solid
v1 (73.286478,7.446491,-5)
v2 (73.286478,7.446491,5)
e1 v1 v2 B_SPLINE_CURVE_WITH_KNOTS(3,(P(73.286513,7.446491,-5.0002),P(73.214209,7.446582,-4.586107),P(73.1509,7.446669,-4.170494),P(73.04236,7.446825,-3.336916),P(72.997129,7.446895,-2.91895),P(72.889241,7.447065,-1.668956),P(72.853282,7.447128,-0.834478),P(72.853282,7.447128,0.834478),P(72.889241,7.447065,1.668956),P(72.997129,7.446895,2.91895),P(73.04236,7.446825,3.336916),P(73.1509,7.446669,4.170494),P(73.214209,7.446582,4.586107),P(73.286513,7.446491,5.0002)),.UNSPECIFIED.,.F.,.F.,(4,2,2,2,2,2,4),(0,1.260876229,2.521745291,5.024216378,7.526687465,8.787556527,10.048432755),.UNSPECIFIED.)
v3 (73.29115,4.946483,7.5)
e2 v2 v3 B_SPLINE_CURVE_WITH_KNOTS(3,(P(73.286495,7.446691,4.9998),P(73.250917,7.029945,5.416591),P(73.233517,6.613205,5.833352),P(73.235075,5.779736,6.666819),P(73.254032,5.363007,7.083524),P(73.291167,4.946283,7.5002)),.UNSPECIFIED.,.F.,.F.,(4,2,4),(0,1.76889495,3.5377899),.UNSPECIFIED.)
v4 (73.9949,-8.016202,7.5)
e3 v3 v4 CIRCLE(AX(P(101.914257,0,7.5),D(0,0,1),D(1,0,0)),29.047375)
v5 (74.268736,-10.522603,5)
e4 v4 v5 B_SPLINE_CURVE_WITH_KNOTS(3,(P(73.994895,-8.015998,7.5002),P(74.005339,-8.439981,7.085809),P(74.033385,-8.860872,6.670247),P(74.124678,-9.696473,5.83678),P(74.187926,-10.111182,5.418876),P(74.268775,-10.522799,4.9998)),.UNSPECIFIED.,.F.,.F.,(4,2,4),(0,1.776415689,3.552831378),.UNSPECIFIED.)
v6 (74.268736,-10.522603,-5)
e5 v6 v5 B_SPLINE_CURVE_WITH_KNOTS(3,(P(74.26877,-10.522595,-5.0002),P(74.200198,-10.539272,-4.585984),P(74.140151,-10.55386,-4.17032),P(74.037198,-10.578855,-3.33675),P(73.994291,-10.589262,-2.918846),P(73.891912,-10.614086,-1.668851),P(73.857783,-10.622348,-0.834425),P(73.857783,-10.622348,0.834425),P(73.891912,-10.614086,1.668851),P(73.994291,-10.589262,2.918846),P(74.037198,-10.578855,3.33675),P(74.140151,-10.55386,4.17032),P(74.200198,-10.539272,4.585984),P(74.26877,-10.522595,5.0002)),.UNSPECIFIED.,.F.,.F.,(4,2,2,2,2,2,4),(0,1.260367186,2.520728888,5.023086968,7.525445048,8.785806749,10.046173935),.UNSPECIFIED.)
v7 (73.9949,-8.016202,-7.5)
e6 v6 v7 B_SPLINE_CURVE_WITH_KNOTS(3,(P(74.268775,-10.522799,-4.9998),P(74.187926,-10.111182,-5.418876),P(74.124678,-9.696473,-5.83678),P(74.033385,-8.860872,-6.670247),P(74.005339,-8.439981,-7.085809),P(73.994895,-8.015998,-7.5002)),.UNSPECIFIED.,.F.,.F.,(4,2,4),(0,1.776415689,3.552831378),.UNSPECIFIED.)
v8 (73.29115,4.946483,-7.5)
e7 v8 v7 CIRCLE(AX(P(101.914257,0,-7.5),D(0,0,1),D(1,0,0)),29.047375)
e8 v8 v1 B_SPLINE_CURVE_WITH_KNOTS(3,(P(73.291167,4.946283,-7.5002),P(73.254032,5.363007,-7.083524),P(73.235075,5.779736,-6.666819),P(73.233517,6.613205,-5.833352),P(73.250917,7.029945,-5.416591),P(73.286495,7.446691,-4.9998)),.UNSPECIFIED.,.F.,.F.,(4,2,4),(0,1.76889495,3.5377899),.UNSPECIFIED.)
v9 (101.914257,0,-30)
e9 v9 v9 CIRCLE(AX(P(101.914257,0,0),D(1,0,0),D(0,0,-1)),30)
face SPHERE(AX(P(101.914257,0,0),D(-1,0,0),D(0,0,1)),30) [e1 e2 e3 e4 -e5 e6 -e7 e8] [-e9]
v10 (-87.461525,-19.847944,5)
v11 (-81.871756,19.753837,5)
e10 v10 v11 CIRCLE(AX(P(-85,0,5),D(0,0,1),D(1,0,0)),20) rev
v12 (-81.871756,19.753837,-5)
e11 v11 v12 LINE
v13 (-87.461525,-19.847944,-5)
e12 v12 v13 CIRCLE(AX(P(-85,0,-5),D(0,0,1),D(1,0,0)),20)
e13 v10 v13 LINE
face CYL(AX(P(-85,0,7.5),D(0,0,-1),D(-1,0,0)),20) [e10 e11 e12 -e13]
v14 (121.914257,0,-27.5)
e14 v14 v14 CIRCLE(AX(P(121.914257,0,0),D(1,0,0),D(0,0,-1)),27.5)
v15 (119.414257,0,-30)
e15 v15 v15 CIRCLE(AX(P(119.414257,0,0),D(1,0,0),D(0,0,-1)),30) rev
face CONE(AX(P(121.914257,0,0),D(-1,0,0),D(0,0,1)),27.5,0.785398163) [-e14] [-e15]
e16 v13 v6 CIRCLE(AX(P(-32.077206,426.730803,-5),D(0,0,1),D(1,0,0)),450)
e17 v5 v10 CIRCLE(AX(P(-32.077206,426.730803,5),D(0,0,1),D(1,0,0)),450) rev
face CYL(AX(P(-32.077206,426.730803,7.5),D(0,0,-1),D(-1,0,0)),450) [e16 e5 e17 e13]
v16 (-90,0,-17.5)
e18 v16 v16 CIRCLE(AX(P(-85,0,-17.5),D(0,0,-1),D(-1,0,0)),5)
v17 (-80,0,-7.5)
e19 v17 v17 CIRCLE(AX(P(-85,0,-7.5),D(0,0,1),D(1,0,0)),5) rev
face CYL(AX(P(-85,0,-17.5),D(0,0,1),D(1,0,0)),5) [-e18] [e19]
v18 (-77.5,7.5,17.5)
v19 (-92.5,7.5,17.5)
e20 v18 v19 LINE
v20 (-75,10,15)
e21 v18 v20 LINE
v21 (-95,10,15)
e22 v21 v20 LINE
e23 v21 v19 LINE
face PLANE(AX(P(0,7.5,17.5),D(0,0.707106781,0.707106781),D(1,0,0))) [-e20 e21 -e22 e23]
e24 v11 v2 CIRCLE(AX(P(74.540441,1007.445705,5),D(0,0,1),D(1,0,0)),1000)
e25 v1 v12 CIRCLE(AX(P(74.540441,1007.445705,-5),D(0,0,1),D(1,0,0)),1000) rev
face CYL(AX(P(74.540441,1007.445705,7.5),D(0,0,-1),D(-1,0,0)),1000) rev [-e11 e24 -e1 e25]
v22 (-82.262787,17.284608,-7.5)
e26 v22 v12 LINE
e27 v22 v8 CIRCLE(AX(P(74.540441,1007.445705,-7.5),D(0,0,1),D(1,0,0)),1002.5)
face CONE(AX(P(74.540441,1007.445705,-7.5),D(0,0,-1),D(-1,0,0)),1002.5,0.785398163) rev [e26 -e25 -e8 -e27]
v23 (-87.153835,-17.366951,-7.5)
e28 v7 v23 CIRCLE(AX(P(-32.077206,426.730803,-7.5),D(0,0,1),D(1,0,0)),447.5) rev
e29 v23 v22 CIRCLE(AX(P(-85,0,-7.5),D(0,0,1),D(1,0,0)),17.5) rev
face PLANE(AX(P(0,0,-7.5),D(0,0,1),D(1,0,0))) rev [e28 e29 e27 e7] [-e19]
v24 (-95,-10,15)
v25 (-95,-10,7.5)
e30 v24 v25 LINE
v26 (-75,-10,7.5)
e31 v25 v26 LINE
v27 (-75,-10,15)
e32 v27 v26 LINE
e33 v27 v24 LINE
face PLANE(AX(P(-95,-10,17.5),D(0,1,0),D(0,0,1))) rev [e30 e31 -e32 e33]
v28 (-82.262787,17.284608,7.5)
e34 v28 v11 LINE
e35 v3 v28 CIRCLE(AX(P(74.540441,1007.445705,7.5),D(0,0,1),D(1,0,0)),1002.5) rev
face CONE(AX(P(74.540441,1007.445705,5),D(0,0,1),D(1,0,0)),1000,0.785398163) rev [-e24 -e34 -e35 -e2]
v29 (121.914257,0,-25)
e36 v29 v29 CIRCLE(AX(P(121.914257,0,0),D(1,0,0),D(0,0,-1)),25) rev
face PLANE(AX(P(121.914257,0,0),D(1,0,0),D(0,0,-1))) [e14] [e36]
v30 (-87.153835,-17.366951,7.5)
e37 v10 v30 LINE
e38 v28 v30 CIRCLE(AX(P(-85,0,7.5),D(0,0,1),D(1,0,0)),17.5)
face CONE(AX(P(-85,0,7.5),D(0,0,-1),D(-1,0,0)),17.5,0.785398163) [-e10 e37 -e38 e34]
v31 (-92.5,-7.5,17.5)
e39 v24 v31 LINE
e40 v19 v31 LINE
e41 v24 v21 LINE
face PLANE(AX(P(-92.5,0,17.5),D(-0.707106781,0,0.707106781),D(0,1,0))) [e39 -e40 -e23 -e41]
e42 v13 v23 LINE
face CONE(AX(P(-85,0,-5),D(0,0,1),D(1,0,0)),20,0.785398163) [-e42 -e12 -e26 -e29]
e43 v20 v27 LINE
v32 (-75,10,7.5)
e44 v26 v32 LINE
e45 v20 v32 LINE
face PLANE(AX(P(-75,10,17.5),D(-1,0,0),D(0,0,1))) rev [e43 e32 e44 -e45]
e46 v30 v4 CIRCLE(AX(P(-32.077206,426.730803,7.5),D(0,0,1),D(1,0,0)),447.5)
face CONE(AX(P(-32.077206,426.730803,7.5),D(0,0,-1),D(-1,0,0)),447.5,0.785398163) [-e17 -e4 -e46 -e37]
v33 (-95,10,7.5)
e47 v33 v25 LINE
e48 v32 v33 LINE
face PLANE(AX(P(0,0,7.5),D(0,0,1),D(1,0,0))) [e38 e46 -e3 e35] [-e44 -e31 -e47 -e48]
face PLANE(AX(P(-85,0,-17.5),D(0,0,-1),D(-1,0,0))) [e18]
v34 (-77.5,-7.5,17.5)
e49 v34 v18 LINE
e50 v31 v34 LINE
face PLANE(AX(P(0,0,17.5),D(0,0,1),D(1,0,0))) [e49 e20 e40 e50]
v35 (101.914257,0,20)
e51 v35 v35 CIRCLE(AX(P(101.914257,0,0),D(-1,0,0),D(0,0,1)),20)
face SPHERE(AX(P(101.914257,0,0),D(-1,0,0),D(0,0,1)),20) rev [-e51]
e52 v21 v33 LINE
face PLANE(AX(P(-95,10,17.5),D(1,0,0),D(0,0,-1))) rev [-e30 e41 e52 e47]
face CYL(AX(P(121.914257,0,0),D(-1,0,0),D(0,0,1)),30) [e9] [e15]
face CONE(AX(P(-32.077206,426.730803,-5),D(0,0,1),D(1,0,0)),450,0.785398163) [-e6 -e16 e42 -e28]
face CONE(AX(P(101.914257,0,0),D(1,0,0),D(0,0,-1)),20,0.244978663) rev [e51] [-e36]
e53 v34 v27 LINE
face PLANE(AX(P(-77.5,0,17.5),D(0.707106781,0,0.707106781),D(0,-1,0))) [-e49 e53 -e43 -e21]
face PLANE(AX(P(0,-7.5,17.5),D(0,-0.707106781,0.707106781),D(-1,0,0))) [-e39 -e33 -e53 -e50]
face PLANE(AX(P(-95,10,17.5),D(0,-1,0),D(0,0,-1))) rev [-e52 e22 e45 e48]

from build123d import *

# Parameters (mm, degrees)
BOSS_EXTRUDE1_DEPTH = 7.5
CHAMFER1_SIZE       = 2.5
SKETCH3_W           = 20
SKETCH3_H           = 20
BOSS_EXTRUDE2_DEPTH = 10
CHAMFER4_SIZE       = 2.5
SKETCH6_R           = 5
BOSS_EXTRUDE3_DEPTH = 10
CUT_EXTRUDE3_DEPTH  = 17
SKETCH11_R          = 30
SKETCH11_R_2        = 20
BOSS_EXTRUDE4_DEPTH = 20
CHAMFER5_SIZE2      = 20
CHAMFER5_SIZE       = 5
CHAMFER6_SIZE       = 2.5


with BuildPart() as part:
    # Sketch2 → Boss-Extrude1 (new, symmetric)
    with BuildSketch(Plane.XY):
        with BuildLine():
            ThreePointArc((84.922137279, 7.499595816), (1.268561005, 10.133701432), (-81.871756055, 19.753837344))
            ThreePointArc((-81.871756055, 19.753837344), (-104.803696773, 2.795280684), (-87.461525308, -19.847944306))
            ThreePointArc((-87.461525308, -19.847944306), (0.380210023, -22.09713345), (86.984359422, -7.232725467))
            ThreePointArc((86.984359422, -7.232725467), (92.427584063, 1.039709088), (84.922137279, 7.499595816))
        make_face()
    extrude(amount=BOSS_EXTRUDE1_DEPTH, both=True)

    # Chamfer1
    chamfer1_edges = [part.edges().sort_by_distance(p)[0] for p in [
        (92.427584063, 1.039709088, 7.5),
        (1.268561005, 10.133701432, 7.5),
        (-104.803696773, 2.795280684, 7.5),
        (0.380210023, -22.09713345, 7.5),
        (-104.803696773, 2.795280684, -7.5),
        (1.268561005, 10.133701432, -7.5),
        (92.427584063, 1.039709088, -7.5),
        (0.380210023, -22.09713345, -7.5),
    ]]
    chamfer(chamfer1_edges, length=CHAMFER1_SIZE)

    # Sketch3 → Boss-Extrude2 (add)
    with BuildSketch(Plane.XY.offset(7.5)):
        with Locations((-85, 0)):
            Rectangle(SKETCH3_W, SKETCH3_H)
    extrude(amount=BOSS_EXTRUDE2_DEPTH)

    # Chamfer4
    chamfer4_edges = [part.edges().sort_by_distance(p)[0] for p in [
        (-75, 0, 17.5),
        (-85, 10, 17.5),
        (-95, 0, 17.5),
        (-85, -10, 17.5),
    ]]
    chamfer(chamfer4_edges, length=CHAMFER4_SIZE)

    # Sketch6 → Boss-Extrude3 (add)
    with BuildSketch(Plane(origin=(0, 0, -7.5), x_dir=(-1, 0, 0), z_dir=(0, 0, -1))):
        with Locations(Location((85, 0, 0), (0, 0, 180))):
            Circle(SKETCH6_R)
    extrude(amount=BOSS_EXTRUDE3_DEPTH)

    # Sketch7 → Cut-Extrude3 (cut, symmetric)
    with BuildSketch(Plane(origin=(0, 0, 0), x_dir=(1, 0, 0), z_dir=(0, 1, 0))):
        with BuildLine():
            ThreePointArc((101.914257425, 20), (87.772121801, 14.142135624), (81.914257425, 0))
            Line((81.914257425, 0), (101.914257425, 0))
            Line((101.914257425, 0), (101.914257425, 20))
        make_face()
        with BuildLine():
            Line((101.914257425, 0), (81.914257425, 0))
            ThreePointArc((81.914257425, 0), (87.772121801, -14.142135624), (101.914257425, -20))
            Line((101.914257425, -20), (101.914257425, 0))
        make_face()
    extrude(amount=CUT_EXTRUDE3_DEPTH, both=True, mode=Mode.SUBTRACT)

    # Sketch7<5> one side → Revolve2 (revolve)
    with BuildSketch(Plane(origin=(0, 0, 0), x_dir=(1, 0, 0), z_dir=(0, 1, 0)), mode=Mode.PRIVATE) as revolve2_sk:
        with BuildLine():
            Line((101.914257425, 20), (101.914257425, 30))
            ThreePointArc((101.914257425, 30), (80.701053989, 21.213203436), (71.914257425, 0))
            Line((71.914257425, 0), (81.914257425, 0))
            ThreePointArc((81.914257425, 0), (87.772121801, 14.142135624), (101.914257425, 20))
        make_face()
    revolve(revolve2_sk.sketch.rotate(Axis((-136.30632513, 0, 0), (1, 0, 0)), 180), axis=Axis((-136.30632513, 0, 0), (1, 0, 0)))

    # Sketch11 → Boss-Extrude4 (add)
    with BuildSketch(Plane(origin=(101.914257425, 0, 0), x_dir=(0, 0, -1), z_dir=(1, 0, 0))):
        Circle(SKETCH11_R)
        with Locations(Location((0, 0, 0), (0, 0, 180))):
            Circle(SKETCH11_R_2, mode=Mode.SUBTRACT)
    extrude(amount=BOSS_EXTRUDE4_DEPTH)

    # Chamfer5
    chamfer5_edges = [part.edges().sort_by_distance(p)[0] for p in [
        (121.914257425, 0, -20),
    ]]
    chamfer5_side = [part.faces().sort_by_distance(p)[0] for p in [
        (121.914257425, 0, -20.1),
    ]]
    chamfer(chamfer5_edges, length=CHAMFER5_SIZE - 0.0001, length2=CHAMFER5_SIZE2 - 0.0001, reference=chamfer5_side[0])  # a hair under: the kernel refuses the full size

    # Chamfer6
    chamfer6_edges = [part.edges().sort_by_distance(p)[0] for p in [
        (121.914257425, 0, 30),
    ]]
    chamfer(chamfer6_edges, length=CHAMFER6_SIZE)


solid = part.part
